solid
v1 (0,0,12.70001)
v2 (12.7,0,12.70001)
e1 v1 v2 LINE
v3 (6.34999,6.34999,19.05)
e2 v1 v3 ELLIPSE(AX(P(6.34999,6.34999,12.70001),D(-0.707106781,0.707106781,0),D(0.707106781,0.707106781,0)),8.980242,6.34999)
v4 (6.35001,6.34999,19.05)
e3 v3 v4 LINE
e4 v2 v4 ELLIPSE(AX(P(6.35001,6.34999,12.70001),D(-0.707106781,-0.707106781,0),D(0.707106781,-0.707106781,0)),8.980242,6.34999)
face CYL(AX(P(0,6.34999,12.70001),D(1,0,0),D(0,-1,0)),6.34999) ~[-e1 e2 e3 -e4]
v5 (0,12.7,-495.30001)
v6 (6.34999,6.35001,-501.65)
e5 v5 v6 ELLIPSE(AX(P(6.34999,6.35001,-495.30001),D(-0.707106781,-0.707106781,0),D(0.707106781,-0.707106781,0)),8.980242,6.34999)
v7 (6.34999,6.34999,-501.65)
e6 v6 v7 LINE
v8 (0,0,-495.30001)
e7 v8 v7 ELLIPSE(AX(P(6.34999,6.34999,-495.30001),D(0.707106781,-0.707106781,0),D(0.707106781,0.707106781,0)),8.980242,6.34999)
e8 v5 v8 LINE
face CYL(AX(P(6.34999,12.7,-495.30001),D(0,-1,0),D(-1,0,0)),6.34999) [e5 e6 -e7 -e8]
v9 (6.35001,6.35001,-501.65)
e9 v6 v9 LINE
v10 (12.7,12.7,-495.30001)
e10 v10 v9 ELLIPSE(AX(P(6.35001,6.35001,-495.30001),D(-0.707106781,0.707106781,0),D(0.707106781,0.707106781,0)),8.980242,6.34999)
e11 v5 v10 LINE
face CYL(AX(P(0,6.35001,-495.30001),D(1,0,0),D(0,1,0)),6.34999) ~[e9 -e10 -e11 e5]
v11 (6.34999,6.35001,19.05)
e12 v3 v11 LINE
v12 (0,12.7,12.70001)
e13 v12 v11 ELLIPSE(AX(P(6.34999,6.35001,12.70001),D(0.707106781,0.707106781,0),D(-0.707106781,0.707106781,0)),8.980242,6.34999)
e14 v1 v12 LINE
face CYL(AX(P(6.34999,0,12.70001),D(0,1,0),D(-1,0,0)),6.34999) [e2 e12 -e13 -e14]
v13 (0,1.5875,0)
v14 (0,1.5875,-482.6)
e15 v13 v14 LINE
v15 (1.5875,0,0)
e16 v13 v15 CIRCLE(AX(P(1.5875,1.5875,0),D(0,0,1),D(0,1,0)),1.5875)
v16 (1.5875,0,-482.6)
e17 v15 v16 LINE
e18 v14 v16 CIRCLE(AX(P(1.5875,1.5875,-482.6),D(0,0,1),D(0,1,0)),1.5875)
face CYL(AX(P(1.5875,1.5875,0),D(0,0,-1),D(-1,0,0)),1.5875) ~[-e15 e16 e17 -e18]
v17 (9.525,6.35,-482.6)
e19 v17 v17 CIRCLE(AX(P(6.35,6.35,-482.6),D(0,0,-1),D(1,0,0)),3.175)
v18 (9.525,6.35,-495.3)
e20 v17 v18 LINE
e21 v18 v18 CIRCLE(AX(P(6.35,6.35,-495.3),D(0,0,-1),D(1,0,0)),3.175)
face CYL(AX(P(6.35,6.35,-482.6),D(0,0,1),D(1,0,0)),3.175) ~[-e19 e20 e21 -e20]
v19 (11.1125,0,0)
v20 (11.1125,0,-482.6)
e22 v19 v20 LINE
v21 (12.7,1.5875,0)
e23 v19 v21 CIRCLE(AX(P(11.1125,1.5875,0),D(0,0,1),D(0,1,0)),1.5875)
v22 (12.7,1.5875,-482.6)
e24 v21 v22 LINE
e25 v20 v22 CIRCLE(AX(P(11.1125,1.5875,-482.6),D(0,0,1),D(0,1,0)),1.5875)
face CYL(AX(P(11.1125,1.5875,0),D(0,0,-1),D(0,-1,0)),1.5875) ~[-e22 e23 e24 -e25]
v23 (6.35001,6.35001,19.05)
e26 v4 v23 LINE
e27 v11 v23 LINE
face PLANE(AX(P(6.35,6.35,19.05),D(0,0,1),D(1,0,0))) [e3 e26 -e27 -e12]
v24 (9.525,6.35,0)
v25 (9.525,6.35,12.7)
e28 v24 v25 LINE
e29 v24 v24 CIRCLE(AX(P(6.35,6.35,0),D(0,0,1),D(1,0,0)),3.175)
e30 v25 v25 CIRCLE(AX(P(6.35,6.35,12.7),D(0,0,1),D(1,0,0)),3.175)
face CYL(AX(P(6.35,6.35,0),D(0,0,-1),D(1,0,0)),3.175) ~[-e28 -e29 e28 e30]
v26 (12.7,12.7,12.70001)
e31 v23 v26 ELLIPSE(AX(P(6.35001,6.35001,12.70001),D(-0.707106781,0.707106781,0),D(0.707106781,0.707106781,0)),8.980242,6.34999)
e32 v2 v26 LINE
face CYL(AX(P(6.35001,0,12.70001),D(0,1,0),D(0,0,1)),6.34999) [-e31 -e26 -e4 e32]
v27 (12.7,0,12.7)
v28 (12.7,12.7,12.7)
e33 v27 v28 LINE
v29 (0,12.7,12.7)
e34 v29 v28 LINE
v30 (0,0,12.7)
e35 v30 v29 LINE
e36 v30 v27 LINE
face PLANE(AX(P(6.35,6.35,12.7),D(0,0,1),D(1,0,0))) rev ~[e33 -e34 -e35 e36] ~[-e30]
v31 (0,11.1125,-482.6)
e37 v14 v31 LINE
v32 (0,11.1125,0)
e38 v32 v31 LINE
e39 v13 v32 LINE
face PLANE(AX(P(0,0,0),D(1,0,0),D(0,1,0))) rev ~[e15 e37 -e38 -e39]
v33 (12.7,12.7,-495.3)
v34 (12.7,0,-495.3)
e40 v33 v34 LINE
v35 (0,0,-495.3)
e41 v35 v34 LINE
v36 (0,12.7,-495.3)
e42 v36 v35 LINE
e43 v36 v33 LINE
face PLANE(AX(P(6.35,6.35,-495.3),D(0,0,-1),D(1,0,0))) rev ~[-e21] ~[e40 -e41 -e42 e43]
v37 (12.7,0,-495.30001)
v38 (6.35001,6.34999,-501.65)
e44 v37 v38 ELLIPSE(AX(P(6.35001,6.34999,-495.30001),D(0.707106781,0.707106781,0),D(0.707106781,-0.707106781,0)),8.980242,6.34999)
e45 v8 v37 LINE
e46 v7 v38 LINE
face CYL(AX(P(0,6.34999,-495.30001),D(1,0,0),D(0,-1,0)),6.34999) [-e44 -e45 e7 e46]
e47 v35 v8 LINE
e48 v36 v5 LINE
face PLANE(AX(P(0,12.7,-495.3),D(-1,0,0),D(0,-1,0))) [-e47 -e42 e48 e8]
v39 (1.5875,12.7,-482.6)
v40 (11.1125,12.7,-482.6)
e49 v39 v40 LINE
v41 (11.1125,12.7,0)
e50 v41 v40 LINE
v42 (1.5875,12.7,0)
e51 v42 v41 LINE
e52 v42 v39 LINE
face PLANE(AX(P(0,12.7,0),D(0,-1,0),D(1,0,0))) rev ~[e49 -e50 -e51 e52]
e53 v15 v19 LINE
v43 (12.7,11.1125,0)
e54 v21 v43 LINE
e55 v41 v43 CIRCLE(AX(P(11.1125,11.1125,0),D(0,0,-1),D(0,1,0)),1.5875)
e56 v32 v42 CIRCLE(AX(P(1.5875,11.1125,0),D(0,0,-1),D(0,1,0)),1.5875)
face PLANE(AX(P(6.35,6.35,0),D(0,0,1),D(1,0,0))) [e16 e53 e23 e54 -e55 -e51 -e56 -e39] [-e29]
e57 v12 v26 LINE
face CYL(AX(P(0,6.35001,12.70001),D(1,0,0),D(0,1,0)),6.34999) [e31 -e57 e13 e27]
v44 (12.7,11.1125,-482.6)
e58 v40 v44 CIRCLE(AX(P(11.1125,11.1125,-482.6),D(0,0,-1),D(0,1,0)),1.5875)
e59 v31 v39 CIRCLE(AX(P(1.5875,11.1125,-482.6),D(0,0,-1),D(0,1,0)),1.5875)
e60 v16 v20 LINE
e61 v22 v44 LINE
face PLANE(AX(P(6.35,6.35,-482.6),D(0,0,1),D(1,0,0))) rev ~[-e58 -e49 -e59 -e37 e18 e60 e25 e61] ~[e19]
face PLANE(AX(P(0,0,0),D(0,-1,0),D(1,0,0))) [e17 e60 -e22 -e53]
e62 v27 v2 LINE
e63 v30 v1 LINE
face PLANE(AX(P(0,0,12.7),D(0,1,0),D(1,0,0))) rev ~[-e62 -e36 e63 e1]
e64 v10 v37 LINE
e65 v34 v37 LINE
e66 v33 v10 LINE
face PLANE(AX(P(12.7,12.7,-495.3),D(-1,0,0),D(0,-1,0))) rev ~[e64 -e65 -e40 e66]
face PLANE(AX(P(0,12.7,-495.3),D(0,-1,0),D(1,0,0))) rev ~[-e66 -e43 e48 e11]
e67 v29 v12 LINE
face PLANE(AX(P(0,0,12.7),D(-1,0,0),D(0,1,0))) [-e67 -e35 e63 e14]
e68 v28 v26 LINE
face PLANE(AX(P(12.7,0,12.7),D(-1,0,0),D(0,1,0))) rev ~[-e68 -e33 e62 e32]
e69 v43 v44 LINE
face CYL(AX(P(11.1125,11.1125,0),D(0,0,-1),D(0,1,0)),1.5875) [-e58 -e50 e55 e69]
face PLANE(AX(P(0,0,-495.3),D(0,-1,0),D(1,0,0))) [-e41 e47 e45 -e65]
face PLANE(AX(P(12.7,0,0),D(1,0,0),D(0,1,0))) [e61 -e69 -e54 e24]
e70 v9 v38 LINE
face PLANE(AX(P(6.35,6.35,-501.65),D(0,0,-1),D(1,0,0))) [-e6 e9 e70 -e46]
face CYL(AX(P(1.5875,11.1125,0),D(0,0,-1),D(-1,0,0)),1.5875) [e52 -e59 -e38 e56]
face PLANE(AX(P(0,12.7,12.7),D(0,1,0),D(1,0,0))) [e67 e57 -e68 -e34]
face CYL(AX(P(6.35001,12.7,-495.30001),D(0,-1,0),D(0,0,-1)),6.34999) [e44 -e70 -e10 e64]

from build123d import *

# Parameters (mm, degrees)
F0_W      = 12.7
F0_H      = 12.7
F1_DEPTH  = 482.6
F2_R      = 3.175
F3_DEPTH  = 12.7
F4_R      = 3.175
F5_DEPTH  = 12.7
F6_W      = 12.7
F6_H      = 12.7
F7_DEPTH  = 6.35
F8_R      = 6.34999
F9_W      = 12.7
F9_H      = 12.7
F10_DEPTH = 6.35
F11_R     = 6.34999
F12_R     = 1.5875


# Not quite as in the source:
# - a fillet or chamfer is up to 0.001 mm smaller than in the source, because OpenCascade refuses the exact size


with BuildPart() as f1:
    # F0 (on Top) → F1 (new body)
    with BuildSketch(Plane.XY):
        with Locations((6.35, 6.35)):
            Rectangle(F0_W, F0_H)
    extrude(amount=-F1_DEPTH)

    # F2 (on face) → F3 (join)
    with BuildSketch(Plane.XY):
        with Locations((6.35, 6.35)):
            Circle(F2_R)
    extrude(amount=F3_DEPTH)

    # F4 (on face) → F5 (join)
    with BuildSketch(Plane(origin=(0, 0, -482.6), x_dir=(1, 0, 0), z_dir=(0, 0, -1))):
        with Locations((6.35, -6.35)):
            Circle(F4_R)
    extrude(amount=F5_DEPTH)

    # F6 (on face) → F7 (join)
    with BuildSketch(Plane.XY.offset(12.7)):
        with Locations((6.35, 6.35)):
            Rectangle(F6_W, F6_H)
    extrude(amount=F7_DEPTH)

    # F8 (radius 6.35 in the source; OpenCascade refuses exactly that, so slightly less here)
    f8_edges = [f1.edges().sort_by_distance(p)[0] for p in [
        (0, 6.35, 19.05),
        (6.35, 0, 19.05),
        (12.7, 6.35, 19.05),
        (6.35, 12.7, 19.05),
    ]]
    fillet(f8_edges, radius=F8_R)

    # F9 (on face) → F10 (join)
    with BuildSketch(Plane(origin=(0, 0, -495.3), x_dir=(1, 0, 0), z_dir=(0, 0, -1))):
        with Locations((6.35, -6.35)):
            Rectangle(F9_W, F9_H)
    extrude(amount=F10_DEPTH)

    # F11 (radius 6.35 in the source; OpenCascade refuses exactly that, so slightly less here)
    f11_edges = [f1.edges().sort_by_distance(p)[0] for p in [
        (6.35, 0, -501.65),
        (0, 6.35, -501.65),
        (6.35, 12.7, -501.65),
        (12.7, 6.35, -501.65),
    ]]
    fillet(f11_edges, radius=F11_R)

    # F12
    f12_edges = [f1.edges().sort_by_distance(p)[0] for p in [
        (0, 0, -241.3),
        (0, 12.7, -241.3),
        (12.7, 0, -241.3),
        (12.7, 12.7, -241.3),
    ]]
    fillet(f12_edges, radius=F12_R)


solid = f1.part
